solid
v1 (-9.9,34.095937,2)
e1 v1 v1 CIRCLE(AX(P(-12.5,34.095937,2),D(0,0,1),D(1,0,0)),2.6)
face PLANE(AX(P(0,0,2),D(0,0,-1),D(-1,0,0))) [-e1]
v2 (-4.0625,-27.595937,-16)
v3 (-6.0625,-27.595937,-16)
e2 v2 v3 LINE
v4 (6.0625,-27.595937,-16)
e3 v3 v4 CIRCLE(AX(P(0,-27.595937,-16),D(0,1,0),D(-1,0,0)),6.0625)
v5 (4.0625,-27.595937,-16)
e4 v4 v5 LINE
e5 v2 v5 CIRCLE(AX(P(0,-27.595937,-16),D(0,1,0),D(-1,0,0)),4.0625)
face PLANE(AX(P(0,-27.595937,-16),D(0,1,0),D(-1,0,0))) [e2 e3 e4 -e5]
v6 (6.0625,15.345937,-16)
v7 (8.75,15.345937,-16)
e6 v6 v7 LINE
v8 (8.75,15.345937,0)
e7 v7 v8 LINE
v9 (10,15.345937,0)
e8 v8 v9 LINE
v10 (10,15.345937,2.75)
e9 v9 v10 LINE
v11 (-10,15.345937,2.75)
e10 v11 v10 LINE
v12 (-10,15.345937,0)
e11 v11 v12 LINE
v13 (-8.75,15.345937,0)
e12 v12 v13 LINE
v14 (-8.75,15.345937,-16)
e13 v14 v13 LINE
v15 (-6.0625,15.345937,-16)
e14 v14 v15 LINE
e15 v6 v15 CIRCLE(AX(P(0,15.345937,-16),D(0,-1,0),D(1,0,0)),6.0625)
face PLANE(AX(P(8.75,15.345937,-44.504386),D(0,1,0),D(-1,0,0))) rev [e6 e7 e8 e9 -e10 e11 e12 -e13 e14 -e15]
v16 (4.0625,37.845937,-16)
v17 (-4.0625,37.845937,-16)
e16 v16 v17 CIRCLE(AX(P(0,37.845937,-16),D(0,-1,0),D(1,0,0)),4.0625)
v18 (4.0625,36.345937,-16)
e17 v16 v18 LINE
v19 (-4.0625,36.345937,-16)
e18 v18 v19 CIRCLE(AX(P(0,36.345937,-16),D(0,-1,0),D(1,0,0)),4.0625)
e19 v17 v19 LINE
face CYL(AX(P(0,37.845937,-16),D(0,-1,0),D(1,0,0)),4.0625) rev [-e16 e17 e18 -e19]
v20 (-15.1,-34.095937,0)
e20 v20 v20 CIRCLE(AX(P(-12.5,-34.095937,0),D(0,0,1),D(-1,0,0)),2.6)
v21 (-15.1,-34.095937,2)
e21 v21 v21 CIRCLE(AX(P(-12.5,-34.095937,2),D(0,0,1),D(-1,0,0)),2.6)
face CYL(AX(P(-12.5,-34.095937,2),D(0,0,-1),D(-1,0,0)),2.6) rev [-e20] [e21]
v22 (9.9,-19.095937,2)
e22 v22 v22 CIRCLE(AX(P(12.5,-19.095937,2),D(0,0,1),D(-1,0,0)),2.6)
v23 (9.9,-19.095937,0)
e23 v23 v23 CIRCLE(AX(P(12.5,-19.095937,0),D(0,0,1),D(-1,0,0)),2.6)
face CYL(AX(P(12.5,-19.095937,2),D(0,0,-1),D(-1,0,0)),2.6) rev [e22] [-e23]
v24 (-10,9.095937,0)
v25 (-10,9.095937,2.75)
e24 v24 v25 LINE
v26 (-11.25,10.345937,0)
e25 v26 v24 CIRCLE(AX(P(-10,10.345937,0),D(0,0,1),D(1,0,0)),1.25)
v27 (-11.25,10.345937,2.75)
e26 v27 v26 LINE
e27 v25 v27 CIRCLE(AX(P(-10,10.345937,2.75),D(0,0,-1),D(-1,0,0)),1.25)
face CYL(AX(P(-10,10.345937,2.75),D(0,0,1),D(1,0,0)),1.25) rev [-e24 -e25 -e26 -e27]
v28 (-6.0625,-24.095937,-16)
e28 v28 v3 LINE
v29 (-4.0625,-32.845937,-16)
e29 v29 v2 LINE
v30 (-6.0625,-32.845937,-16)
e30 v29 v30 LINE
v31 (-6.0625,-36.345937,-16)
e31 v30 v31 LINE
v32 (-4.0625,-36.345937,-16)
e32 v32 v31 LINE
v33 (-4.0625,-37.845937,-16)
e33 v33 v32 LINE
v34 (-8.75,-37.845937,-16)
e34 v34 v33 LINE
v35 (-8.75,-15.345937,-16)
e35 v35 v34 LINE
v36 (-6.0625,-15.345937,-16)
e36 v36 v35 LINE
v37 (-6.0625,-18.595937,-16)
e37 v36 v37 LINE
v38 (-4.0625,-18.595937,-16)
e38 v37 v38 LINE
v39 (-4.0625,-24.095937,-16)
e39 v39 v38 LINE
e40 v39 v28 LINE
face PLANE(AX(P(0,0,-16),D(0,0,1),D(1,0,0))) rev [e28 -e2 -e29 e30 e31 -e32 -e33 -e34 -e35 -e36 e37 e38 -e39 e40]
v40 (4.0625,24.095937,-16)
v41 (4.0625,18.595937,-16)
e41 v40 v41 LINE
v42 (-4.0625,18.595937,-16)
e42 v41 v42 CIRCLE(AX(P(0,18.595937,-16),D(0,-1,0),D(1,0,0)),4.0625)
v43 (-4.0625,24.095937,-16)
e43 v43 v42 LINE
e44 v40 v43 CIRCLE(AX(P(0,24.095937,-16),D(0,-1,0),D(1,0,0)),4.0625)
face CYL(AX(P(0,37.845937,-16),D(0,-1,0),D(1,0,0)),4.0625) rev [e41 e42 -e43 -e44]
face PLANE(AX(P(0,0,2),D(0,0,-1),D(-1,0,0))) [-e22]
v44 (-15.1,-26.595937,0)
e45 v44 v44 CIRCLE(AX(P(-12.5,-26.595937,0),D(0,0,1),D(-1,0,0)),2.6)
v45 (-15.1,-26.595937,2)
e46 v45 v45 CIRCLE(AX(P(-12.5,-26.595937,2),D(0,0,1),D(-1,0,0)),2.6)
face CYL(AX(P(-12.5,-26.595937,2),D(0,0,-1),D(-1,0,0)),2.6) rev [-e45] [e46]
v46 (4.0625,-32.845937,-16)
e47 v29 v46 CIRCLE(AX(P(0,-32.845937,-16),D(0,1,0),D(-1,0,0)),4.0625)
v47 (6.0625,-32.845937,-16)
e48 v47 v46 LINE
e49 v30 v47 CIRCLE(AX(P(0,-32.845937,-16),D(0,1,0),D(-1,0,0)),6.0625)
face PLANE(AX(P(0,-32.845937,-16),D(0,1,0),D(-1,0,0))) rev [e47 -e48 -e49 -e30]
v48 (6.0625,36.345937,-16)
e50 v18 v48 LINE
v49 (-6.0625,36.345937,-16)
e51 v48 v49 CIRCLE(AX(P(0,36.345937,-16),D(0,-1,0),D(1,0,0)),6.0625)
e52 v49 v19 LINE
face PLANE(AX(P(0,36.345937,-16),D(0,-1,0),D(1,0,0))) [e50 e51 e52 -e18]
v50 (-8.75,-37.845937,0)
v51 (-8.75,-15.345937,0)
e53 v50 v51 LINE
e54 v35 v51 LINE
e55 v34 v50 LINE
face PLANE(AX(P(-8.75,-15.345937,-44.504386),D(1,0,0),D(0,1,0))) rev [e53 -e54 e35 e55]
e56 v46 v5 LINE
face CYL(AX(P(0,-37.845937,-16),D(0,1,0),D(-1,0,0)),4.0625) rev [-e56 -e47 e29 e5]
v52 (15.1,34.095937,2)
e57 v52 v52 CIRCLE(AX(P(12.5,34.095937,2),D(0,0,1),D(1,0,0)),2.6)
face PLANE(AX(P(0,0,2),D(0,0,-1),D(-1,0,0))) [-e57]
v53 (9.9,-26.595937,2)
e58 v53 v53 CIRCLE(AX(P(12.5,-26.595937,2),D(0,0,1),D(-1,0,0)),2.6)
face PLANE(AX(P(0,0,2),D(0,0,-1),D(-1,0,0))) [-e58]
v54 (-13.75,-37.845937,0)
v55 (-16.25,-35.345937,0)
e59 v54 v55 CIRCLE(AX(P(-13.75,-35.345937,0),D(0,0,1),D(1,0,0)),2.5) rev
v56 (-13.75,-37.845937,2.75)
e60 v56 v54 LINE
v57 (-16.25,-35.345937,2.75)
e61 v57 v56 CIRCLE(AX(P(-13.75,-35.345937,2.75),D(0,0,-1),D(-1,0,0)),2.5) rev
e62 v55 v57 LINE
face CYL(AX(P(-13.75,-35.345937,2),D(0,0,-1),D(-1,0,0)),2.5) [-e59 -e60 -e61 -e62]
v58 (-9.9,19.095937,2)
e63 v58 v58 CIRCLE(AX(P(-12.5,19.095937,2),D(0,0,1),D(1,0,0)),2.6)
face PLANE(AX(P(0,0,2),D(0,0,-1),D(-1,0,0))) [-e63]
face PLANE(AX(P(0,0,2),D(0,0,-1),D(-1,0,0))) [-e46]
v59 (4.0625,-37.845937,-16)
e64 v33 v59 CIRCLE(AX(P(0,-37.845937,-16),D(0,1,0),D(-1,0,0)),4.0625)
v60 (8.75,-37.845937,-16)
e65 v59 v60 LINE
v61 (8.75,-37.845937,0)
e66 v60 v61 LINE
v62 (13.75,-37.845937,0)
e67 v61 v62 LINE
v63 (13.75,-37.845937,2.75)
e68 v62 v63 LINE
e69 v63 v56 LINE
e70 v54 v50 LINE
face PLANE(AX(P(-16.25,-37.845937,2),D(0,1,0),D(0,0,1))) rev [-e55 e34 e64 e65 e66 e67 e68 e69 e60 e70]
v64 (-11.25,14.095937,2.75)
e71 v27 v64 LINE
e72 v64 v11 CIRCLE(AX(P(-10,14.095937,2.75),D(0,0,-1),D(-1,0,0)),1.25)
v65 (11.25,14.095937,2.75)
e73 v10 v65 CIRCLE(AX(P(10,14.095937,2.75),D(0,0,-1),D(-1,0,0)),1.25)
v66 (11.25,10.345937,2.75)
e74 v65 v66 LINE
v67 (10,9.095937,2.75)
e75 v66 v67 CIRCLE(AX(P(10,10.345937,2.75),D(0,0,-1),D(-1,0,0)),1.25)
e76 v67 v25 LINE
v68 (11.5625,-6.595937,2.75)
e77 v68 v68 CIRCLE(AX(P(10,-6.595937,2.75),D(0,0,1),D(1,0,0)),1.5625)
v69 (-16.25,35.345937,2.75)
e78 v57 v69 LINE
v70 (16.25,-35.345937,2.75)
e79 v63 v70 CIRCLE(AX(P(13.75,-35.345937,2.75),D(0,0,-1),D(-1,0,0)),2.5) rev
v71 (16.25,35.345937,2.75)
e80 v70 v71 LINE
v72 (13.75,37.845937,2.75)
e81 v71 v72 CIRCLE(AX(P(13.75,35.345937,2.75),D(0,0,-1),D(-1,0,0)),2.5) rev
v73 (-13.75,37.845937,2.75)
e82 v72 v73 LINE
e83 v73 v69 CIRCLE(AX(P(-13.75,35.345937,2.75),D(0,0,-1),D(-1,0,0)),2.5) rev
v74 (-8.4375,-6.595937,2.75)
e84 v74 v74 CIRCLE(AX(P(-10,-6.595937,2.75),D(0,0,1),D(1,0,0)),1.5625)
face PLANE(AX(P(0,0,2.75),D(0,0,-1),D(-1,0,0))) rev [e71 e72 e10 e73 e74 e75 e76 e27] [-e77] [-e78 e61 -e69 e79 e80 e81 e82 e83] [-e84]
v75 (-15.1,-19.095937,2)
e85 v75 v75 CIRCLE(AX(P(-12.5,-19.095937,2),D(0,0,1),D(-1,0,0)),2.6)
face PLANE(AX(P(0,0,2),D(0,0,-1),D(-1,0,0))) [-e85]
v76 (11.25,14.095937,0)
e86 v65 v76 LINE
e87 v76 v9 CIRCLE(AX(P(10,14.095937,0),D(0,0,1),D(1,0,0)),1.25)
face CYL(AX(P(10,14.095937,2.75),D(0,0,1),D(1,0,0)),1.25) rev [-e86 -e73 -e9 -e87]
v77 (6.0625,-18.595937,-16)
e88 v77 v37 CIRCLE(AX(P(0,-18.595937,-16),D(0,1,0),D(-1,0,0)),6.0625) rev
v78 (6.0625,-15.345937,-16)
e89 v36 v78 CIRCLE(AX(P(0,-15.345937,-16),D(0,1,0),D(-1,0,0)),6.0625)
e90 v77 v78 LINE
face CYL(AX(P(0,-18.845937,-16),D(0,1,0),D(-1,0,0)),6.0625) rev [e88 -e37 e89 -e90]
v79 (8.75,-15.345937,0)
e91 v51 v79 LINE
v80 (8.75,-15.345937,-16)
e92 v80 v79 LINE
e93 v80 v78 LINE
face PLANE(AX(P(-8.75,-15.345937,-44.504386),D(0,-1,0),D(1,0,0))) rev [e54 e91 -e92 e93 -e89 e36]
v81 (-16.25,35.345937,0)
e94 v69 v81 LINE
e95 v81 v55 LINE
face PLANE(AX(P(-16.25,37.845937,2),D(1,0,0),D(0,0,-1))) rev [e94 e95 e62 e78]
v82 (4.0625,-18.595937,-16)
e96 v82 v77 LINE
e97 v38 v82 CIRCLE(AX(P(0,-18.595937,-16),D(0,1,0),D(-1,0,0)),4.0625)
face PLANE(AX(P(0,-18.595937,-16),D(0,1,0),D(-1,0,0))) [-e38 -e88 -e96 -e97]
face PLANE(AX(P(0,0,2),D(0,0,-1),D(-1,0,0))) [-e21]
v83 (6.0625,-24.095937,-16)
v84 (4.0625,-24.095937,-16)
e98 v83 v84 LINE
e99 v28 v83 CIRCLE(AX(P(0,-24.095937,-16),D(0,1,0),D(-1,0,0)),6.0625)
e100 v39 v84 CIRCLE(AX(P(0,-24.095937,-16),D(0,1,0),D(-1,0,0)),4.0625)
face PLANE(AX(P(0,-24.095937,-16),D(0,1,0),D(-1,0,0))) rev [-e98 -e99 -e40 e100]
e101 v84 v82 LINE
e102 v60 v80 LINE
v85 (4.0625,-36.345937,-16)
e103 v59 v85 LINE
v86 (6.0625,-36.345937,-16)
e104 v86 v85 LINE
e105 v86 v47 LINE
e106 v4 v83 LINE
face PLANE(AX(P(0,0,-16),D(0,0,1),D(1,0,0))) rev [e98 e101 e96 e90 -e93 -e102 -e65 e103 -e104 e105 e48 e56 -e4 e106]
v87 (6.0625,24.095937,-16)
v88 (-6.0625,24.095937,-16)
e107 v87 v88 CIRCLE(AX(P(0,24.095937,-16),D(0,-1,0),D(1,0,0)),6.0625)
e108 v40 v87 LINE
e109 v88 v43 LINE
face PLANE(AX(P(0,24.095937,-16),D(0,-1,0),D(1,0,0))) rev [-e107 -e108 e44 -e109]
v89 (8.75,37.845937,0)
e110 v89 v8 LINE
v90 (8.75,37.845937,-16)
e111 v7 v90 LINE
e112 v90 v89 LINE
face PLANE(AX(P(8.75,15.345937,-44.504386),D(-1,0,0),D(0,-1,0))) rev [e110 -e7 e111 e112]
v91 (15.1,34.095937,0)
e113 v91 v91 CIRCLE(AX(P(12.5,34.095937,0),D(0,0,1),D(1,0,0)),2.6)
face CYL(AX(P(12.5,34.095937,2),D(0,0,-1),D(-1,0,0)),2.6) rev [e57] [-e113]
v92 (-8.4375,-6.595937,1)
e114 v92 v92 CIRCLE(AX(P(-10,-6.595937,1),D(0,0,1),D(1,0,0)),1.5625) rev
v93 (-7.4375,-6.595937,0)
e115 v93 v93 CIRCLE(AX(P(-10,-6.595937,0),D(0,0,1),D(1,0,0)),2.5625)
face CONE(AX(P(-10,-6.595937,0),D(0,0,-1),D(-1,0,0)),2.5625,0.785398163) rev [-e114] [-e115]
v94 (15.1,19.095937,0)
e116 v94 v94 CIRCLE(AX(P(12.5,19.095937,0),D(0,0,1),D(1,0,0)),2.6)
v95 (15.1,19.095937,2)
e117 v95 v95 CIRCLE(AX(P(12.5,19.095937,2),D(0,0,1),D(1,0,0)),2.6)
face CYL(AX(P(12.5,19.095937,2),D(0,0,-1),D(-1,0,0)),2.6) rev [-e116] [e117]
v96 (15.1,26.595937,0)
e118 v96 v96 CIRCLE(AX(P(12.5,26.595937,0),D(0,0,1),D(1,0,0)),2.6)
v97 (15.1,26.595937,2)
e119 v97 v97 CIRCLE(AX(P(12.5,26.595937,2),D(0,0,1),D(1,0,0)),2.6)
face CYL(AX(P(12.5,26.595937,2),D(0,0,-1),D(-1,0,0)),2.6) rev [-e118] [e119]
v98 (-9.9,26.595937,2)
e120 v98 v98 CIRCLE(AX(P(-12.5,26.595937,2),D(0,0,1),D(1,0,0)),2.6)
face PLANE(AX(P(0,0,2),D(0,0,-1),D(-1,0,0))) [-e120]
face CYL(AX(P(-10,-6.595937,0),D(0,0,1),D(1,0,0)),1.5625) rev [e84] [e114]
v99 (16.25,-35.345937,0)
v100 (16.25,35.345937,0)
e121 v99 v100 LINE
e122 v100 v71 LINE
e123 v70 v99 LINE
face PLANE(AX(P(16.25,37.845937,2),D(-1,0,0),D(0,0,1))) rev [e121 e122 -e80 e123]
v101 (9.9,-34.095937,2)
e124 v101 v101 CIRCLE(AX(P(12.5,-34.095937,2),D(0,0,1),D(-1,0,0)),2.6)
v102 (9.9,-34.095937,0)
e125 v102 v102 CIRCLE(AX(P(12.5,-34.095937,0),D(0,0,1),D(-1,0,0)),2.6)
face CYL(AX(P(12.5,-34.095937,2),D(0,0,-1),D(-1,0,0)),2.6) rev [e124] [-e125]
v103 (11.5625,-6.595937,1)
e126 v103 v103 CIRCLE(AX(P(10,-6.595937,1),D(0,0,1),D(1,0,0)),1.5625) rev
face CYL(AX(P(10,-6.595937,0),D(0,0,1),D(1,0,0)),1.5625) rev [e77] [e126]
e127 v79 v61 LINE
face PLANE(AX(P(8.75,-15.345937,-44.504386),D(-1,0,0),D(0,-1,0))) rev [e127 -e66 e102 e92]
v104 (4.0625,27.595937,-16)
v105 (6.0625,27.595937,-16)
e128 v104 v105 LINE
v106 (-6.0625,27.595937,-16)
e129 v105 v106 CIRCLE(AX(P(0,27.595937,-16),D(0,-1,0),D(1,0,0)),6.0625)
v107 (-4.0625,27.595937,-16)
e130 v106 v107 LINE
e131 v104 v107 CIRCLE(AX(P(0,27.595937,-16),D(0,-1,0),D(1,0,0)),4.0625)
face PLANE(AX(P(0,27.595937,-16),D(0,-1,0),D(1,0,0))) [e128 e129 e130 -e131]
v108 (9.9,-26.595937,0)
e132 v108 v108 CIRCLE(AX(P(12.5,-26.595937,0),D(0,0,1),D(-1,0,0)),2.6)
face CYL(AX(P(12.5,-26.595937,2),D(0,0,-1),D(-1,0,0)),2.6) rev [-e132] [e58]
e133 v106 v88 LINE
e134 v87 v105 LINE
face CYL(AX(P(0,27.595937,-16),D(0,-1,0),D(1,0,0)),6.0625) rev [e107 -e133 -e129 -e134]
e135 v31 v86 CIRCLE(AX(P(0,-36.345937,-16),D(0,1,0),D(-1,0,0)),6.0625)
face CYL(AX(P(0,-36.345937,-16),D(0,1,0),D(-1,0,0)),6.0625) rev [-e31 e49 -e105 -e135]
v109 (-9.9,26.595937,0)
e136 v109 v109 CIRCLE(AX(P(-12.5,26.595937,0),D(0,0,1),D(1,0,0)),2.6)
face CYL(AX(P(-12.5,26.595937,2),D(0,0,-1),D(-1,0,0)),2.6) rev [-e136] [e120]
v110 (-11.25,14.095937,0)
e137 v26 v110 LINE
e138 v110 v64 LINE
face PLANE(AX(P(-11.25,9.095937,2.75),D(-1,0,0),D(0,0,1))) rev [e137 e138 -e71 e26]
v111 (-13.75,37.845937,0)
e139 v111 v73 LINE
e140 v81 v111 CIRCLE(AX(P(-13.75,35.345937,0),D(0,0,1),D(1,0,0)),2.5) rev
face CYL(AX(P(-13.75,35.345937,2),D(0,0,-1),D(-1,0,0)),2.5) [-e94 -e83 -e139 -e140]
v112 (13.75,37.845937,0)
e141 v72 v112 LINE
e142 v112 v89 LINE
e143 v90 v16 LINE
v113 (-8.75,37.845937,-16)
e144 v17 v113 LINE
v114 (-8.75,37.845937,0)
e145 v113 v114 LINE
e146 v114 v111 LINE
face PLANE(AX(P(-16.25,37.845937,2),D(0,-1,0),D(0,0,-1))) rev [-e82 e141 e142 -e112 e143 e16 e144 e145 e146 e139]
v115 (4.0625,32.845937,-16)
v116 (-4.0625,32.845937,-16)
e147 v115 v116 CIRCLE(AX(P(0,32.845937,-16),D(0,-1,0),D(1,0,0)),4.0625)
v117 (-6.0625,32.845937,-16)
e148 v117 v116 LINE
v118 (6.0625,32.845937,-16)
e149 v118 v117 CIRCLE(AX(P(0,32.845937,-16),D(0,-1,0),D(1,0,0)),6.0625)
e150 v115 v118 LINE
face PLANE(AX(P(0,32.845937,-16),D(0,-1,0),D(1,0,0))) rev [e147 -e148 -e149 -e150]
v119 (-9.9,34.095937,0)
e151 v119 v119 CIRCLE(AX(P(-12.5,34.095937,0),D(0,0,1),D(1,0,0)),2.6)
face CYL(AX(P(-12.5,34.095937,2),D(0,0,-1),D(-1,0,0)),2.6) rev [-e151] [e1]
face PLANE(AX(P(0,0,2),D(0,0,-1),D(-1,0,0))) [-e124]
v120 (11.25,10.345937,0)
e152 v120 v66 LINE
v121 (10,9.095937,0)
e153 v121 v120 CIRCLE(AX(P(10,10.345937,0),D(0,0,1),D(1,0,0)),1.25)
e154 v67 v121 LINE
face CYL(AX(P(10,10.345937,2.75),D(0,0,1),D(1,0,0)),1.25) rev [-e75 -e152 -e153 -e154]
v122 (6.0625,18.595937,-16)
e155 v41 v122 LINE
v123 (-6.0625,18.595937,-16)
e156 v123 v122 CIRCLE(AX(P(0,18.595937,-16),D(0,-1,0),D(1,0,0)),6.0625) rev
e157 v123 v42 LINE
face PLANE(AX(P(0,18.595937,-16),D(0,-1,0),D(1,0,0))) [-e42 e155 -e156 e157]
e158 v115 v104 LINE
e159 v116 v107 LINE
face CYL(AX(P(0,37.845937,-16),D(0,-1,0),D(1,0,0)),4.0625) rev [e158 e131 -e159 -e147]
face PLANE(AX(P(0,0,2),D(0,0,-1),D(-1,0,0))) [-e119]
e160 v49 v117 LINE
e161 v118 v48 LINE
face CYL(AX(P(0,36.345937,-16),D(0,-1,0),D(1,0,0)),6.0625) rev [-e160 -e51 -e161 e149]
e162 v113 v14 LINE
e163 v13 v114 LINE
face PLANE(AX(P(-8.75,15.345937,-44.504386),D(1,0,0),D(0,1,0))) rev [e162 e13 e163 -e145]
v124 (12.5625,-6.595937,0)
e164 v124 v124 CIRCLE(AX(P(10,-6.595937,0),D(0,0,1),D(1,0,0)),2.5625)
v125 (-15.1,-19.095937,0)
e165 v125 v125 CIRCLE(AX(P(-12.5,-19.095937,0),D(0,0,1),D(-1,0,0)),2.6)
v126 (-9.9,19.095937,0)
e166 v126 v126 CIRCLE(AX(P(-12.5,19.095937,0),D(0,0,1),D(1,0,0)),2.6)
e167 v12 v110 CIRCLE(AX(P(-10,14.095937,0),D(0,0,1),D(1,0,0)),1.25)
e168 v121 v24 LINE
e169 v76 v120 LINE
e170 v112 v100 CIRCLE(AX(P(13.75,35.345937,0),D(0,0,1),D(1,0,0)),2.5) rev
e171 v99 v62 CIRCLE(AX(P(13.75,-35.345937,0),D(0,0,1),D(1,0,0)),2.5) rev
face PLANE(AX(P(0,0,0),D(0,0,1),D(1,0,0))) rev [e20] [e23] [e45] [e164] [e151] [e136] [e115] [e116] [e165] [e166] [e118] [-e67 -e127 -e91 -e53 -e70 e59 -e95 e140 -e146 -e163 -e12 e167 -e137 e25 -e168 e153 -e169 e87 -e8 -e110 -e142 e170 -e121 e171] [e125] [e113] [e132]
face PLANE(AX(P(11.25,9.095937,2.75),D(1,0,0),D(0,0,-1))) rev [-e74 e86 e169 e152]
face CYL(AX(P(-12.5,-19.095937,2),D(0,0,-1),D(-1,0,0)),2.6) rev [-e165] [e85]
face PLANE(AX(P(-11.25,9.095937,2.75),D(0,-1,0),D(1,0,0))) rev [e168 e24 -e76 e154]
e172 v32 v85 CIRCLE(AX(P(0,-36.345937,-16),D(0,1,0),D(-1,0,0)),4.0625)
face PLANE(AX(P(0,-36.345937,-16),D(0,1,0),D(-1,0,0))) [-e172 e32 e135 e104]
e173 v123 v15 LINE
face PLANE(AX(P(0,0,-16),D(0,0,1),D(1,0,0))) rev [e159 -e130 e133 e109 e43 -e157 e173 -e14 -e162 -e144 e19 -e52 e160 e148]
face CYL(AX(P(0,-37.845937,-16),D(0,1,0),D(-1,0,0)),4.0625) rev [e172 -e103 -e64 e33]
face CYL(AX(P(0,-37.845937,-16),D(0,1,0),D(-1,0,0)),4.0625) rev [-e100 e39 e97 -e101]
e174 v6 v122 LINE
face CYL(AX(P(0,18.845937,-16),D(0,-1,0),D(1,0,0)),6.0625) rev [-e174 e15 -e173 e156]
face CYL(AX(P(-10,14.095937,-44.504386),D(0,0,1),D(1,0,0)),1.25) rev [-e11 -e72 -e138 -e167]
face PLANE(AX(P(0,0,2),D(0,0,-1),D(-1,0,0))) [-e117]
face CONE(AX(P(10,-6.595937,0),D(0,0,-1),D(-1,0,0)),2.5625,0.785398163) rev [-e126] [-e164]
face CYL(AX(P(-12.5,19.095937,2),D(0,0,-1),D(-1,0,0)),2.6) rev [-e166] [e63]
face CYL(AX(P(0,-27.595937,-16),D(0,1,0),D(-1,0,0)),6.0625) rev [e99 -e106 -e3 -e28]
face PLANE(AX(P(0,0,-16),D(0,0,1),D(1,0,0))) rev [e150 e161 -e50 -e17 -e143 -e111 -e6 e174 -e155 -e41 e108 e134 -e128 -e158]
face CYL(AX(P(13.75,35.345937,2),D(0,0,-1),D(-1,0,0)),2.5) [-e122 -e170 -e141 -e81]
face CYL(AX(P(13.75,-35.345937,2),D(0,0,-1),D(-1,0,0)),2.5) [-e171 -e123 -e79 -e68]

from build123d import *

# Parameters (mm, degrees)
SKETCH1_W                     = 32.5
SKETCH1_H                     = 75.691874882
SKETCH1_R                     = 2.6
BOSS_EXTRUDE1_DEPTH           = 2
BOSS_EXTRUDE2_START           = 2
SKETCH1_2_W                   = 32.5
SKETCH1_2_H                   = 75.691874882
BOSS_EXTRUDE2_DEPTH           = 0.75
SKETCH6_R                     = 1.5625
CUT_EXTRUDE5_DEPTH            = 42.27880789
SKETCH2_W                     = 17.5
SKETCH2_H                     = 22.5
BOSS_EXTRUDE3_DEPTH           = 16
CUT_EXTRUDE6_DEPTH            = 58.874329832
SKETCH7_3_R                   = 6.0625
SKETCH7_3_R_2                 = 4.0625
CUT_EXTRUDE7_DEPTH            = 3.5
LPATTERN3_COUNT               = 3
LPATTERN3_PITCH               = 8.75
CIRPATTERN3_COUNT             = 2
CIRPATTERN3_COPY_1_SKETCH_R   = 6.0625
CIRPATTERN3_COPY_1_SKETCH_R_2 = 4.0625
CIRPATTERN3_COPY_1_DEPTH      = 3.5
CIRPATTERN3_COPY_2_SKETCH_R   = 6.0625
CIRPATTERN3_COPY_2_SKETCH_R_2 = 4.0625
CIRPATTERN3_COPY_2_DEPTH      = 3.5
SKETCH8_W                     = 22.5
SKETCH8_H                     = 6.25
CUT_EXTRUDE8_DEPTH            = 45.1857158
BOSS_EXTRUDE4_START           = -18.845937441
BOSS_EXTRUDE4_DEPTH           = 0.25
BOSS_EXTRUDE6_START           = 18.595937441
BOSS_EXTRUDE6_DEPTH           = 0.25
FILLET1_R                     = 2.5
FILLET2_R                     = 1.25
CHAMFER1_SIZE                 = 1


# Read off the part's stored shape, not the designer's step: Boss-Extrude4, Boss-Extrude6
with BuildPart() as part:
    # Sketch1 → Boss-Extrude1 (new body)
    with BuildSketch(Plane.XY):
        Rectangle(SKETCH1_W, SKETCH1_H)
        with Locations((12.5, 34.095937441)):
            Circle(SKETCH1_R, mode=Mode.SUBTRACT)
        with Locations((-12.5, 34.095937441)):
            Circle(SKETCH1_R, mode=Mode.SUBTRACT)
        with Locations((12.5, 26.595937441)):
            Circle(SKETCH1_R, mode=Mode.SUBTRACT)
        with Locations((12.5, 19.095937441)):
            Circle(SKETCH1_R, mode=Mode.SUBTRACT)
        with Locations((-12.5, 26.595937441)):
            Circle(SKETCH1_R, mode=Mode.SUBTRACT)
        with Locations((-12.5, 19.095937441)):
            Circle(SKETCH1_R, mode=Mode.SUBTRACT)
        with Locations(Location((-12.5, -19.095937441, 0), (0, 0, 180))):
            Circle(SKETCH1_R, mode=Mode.SUBTRACT)
        with Locations(Location((-12.5, -26.595937441, 0), (0, 0, 180))):
            Circle(SKETCH1_R, mode=Mode.SUBTRACT)
        with Locations(Location((12.5, -19.095937441, 0), (0, 0, 180))):
            Circle(SKETCH1_R, mode=Mode.SUBTRACT)
        with Locations(Location((12.5, -26.595937441, 0), (0, 0, 180))):
            Circle(SKETCH1_R, mode=Mode.SUBTRACT)
        with Locations(Location((-12.5, -34.095937441, 0), (0, 0, 180))):
            Circle(SKETCH1_R, mode=Mode.SUBTRACT)
        with Locations(Location((12.5, -34.095937441, 0), (0, 0, 180))):
            Circle(SKETCH1_R, mode=Mode.SUBTRACT)
    extrude(amount=BOSS_EXTRUDE1_DEPTH)

    # Sketch1<2> → Boss-Extrude2 (add)
    with BuildSketch(Plane.XY.offset(BOSS_EXTRUDE2_START)):
        Rectangle(SKETCH1_2_W, SKETCH1_2_H)
    extrude(amount=BOSS_EXTRUDE2_DEPTH)

    # Sketch6 → Cut-Extrude5 (cut, through all)
    with BuildSketch(Plane.XY.offset(2.75)):
        with Locations((10, -6.595937441)):
            Circle(SKETCH6_R)
        with Locations((-10, -6.595937441)):
            Circle(SKETCH6_R)
    extrude(amount=-CUT_EXTRUDE5_DEPTH, mode=Mode.SUBTRACT)

    # Sketch2 → Boss-Extrude3 (add)
    with BuildSketch(Plane(origin=(0, 0, 0), x_dir=(-1, 0, 0), z_dir=(0, 0, -1))):
        with Locations((0, -26.595937441)):
            Rectangle(SKETCH2_W, SKETCH2_H)
    boss_extrude3 = extrude(amount=BOSS_EXTRUDE3_DEPTH)

    # Sketch7 → Cut-Extrude6 (cut, through all)
    with BuildSketch(Plane(origin=(0, -15.345937441, 0), x_dir=(1, 0, 0), z_dir=(0, 1, 0))):
        with BuildLine():
            Line((-4.0625, 16), (4.0625, 16))
            ThreePointArc((4.0625, 16), (0, 20.0625), (-4.0625, 16))
        make_face()
        with BuildLine():
            ThreePointArc((-4.0625, 16), (0, 11.9375), (4.0625, 16))
            Line((4.0625, 16), (-4.0625, 16))
        make_face()
    cut_extrude6 = extrude(amount=-CUT_EXTRUDE6_DEPTH, mode=Mode.SUBTRACT)

    # Sketch7<3> → Cut-Extrude7 (cut)
    with BuildSketch(Plane(origin=(0, -15.345937441, 0), x_dir=(1, 0, 0), z_dir=(0, 1, 0))):
        with Locations((0, 16)):
            Circle(SKETCH7_3_R)
        with Locations((0, 16)):
            Circle(SKETCH7_3_R_2, mode=Mode.SUBTRACT)
    cut_extrude7 = extrude(amount=-CUT_EXTRUDE7_DEPTH, mode=Mode.SUBTRACT)

    # LPattern3: Cut-Extrude7 ×3
    with Locations(*[(0, -i * LPATTERN3_PITCH, 0) for i in range(1, LPATTERN3_COUNT)]):
        add(cut_extrude7, mode=Mode.SUBTRACT)

    # CirPattern3: Boss-Extrude3, Cut-Extrude6, Cut-Extrude7 ×2 about axis
    cirpattern3_axis = Axis((0, 0, 0), (0, 0, 1))
    add([boss_extrude3.rotate(cirpattern3_axis, i * 360 / CIRPATTERN3_COUNT) for i in range(1, CIRPATTERN3_COUNT)])
    add([cut_extrude6.rotate(cirpattern3_axis, i * 360 / CIRPATTERN3_COUNT) for i in range(1, CIRPATTERN3_COUNT)], mode=Mode.SUBTRACT)
    add([cut_extrude7.rotate(cirpattern3_axis, i * 360 / CIRPATTERN3_COUNT) for i in range(1, CIRPATTERN3_COUNT)], mode=Mode.SUBTRACT)

    # CirPattern3 copy 1 sketch → CirPattern3 copy 1 (cut)
    with BuildSketch(Plane(origin=(0, 24.095937441, 0), x_dir=(-1, 0, 0), z_dir=(0, -1, 0))):
        with Locations((0, 16)):
            Circle(CIRPATTERN3_COPY_1_SKETCH_R)
        with Locations((0, 16)):
            Circle(CIRPATTERN3_COPY_1_SKETCH_R_2, mode=Mode.SUBTRACT)
    extrude(amount=-CIRPATTERN3_COPY_1_DEPTH, mode=Mode.SUBTRACT)

    # CirPattern3 copy 2 sketch → CirPattern3 copy 2 (cut)
    with BuildSketch(Plane(origin=(0, 32.845937441, 0), x_dir=(-1, 0, 0), z_dir=(0, -1, 0))):
        with Locations((0, 16)):
            Circle(CIRPATTERN3_COPY_2_SKETCH_R)
        with Locations((0, 16)):
            Circle(CIRPATTERN3_COPY_2_SKETCH_R_2, mode=Mode.SUBTRACT)
    extrude(amount=-CIRPATTERN3_COPY_2_DEPTH, mode=Mode.SUBTRACT)

    # Sketch8 → Cut-Extrude8 (cut, through all)
    with BuildSketch(Plane(origin=(0, 0, 0), x_dir=(-1, 0, 0), z_dir=(0, 0, -1))):
        with Locations((0, 12.220937441)):
            Rectangle(SKETCH8_W, SKETCH8_H)
    extrude(amount=-CUT_EXTRUDE8_DEPTH, mode=Mode.SUBTRACT)

    # Boss-Extrude4 outline → Boss-Extrude4 (add)
    with BuildSketch(Plane(origin=(0, 0, 0), x_dir=(1, 0, 0), z_dir=(0, 1, 0)).offset(BOSS_EXTRUDE4_START)):
        with BuildLine():
            ThreePointArc((4.0625, 16), (0, 11.9375), (-4.0625, 16))
            Line((-4.0625, 16), (-6.0625, 16))
            ThreePointArc((-6.0625, 16), (0, 9.9375), (6.0625, 16))
            Line((6.0625, 16), (4.0625, 16))
        make_face()
    extrude(amount=BOSS_EXTRUDE4_DEPTH)

    # Boss-Extrude6 outline → Boss-Extrude6 (add)
    with BuildSketch(Plane(origin=(0, 0, 0), x_dir=(1, 0, 0), z_dir=(0, 1, 0)).offset(BOSS_EXTRUDE6_START)):
        with BuildLine():
            Line((6.0625, 16), (4.0625, 16))
            ThreePointArc((4.0625, 16), (0, 11.9375), (-4.0625, 16))
            Line((-4.0625, 16), (-6.0625, 16))
            ThreePointArc((-6.0625, 16), (0, 9.9375), (6.0625, 16))
        make_face()
    extrude(amount=BOSS_EXTRUDE6_DEPTH)

    # Fillet1
    fillet1_edges = [part.edges().sort_by_distance(p)[0] for p in [
        (-16.25, 37.845937441, 1.375),
        (16.25, 37.845937441, 1.375),
        (16.25, -37.845937441, 1.375),
        (-16.25, -37.845937441, 1.375),
    ]]
    fillet(fillet1_edges, radius=FILLET1_R)

    # Fillet2
    fillet2_edges = [part.edges().sort_by_distance(p)[0] for p in [
        (11.25, 9.095937441, 1.375),
        (11.25, 15.345937441, 1.375),
        (-11.25, 15.345937441, 1.375),
        (-11.25, 9.095937441, 1.375),
    ]]
    fillet(fillet2_edges, radius=FILLET2_R)

    # Chamfer1
    chamfer1_edges = [part.edges().sort_by_distance(p)[0] for p in [
        (8.4375, -6.595937441, 0),
        (-11.5625, -6.595937441, 0),
    ]]
    chamfer(chamfer1_edges, length=CHAMFER1_SIZE)


solid = part.part
